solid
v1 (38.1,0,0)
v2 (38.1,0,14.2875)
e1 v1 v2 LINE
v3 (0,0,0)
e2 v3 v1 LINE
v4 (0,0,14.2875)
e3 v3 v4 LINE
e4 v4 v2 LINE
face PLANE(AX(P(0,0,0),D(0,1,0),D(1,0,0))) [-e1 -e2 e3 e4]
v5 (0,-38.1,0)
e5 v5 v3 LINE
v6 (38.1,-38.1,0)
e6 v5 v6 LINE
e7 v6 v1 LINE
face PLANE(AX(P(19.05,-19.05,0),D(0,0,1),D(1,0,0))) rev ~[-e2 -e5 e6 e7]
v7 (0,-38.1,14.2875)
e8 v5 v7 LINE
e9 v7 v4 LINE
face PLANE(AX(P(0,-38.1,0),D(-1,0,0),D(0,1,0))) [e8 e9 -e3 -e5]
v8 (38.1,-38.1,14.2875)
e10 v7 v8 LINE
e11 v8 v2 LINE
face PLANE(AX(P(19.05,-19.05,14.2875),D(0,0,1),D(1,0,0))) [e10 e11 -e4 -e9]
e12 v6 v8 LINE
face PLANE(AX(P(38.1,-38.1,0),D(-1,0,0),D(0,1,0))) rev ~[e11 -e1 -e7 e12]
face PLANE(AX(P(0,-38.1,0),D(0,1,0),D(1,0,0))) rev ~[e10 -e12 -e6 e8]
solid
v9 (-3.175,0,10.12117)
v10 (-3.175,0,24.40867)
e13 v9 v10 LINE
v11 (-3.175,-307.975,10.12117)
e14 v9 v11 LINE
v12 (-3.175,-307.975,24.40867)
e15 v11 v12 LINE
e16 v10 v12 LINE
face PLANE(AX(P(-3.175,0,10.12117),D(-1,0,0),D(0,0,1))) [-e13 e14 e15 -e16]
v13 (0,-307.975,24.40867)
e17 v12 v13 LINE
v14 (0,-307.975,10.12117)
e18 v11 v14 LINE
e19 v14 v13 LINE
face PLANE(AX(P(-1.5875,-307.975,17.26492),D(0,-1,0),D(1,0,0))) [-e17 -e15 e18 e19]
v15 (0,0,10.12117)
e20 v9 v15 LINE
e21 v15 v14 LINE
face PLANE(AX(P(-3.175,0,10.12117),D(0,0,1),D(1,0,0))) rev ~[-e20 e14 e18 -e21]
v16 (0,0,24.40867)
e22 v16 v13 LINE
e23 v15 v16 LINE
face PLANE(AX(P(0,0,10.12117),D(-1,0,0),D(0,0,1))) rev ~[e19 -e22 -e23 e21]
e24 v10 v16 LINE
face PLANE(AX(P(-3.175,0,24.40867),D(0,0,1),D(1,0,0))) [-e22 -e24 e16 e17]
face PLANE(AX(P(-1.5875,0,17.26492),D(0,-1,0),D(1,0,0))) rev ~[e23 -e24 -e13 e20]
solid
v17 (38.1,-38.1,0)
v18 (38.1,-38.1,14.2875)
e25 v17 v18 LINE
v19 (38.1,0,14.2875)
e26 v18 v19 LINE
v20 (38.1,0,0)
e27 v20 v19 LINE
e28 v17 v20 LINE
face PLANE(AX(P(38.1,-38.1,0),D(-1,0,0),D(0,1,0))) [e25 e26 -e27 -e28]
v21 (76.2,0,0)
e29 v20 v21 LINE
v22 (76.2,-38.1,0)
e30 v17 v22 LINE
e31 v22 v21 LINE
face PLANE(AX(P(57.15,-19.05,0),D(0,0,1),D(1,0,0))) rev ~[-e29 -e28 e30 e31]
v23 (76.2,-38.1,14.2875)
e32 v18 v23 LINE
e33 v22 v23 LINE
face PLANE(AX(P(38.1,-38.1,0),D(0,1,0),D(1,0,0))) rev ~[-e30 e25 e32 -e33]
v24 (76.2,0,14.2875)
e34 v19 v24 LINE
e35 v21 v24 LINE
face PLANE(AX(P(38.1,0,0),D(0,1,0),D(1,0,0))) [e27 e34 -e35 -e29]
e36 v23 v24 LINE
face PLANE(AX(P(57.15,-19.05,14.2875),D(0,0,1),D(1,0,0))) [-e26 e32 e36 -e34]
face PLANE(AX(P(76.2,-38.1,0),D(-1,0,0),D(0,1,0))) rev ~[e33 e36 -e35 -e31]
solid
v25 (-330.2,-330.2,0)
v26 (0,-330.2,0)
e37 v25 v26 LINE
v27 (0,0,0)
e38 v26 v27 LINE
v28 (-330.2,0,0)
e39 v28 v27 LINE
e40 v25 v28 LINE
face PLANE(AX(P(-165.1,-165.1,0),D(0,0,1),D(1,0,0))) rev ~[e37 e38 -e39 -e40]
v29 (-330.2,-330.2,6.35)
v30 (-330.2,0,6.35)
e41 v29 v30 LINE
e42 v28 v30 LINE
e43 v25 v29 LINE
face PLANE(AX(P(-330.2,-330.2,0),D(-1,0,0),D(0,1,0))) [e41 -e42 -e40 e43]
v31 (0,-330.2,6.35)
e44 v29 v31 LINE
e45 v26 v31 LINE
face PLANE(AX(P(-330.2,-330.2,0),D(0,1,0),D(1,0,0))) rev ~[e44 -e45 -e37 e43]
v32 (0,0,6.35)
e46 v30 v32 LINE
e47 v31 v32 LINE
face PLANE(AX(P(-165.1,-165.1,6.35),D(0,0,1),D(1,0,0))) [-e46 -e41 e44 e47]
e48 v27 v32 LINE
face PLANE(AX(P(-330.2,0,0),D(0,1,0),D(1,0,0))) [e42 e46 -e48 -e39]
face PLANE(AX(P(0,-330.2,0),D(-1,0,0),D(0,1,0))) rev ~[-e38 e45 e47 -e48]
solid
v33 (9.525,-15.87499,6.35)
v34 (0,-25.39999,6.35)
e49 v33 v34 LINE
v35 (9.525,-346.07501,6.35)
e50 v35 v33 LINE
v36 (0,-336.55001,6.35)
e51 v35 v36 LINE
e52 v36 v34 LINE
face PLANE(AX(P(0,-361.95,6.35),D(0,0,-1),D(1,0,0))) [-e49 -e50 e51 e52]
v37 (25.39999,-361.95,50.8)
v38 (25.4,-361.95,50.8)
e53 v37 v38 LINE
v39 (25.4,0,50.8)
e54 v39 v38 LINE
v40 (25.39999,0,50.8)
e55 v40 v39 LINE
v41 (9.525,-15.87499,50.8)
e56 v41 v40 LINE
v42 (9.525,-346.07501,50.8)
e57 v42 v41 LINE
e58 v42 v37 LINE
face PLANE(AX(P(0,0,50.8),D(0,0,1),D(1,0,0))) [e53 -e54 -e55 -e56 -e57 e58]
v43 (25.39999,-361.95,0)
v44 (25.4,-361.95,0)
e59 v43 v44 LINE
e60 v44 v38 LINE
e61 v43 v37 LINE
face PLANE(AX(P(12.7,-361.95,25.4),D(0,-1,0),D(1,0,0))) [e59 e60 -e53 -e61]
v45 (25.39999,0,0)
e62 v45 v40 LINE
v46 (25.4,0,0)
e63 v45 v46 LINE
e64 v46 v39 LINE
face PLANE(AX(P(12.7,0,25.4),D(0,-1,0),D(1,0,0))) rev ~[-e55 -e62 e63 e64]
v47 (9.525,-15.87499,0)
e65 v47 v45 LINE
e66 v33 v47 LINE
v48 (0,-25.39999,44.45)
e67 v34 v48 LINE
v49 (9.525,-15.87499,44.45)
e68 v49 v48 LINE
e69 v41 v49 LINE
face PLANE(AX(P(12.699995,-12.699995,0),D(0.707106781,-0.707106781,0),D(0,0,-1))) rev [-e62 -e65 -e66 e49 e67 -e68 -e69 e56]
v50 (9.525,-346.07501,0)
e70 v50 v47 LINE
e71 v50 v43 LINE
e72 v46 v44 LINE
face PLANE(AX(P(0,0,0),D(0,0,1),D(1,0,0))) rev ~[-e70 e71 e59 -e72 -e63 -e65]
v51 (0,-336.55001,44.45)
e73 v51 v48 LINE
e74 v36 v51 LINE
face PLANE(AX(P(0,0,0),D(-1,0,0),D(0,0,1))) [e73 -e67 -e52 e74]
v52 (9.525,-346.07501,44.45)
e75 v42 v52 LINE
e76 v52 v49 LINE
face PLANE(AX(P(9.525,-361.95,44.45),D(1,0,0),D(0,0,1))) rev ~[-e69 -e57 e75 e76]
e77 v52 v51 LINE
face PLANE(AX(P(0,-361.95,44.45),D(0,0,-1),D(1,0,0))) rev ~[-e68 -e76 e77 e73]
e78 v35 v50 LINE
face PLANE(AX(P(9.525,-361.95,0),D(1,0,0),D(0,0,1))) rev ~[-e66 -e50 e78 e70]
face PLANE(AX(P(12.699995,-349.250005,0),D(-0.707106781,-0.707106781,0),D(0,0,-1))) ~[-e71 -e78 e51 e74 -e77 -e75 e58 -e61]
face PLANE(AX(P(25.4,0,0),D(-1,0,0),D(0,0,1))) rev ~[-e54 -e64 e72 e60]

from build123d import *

# Parameters (mm, degrees)
F0_W      = 330.2
F0_H      = 330.2
F3_DEPTH  = 6.35
F2_W      = 38.1
F2_H      = 38.1
F4_DEPTH  = 14.2875
F1_W      = 25.4
F1_H      = 50.8
F5_DEPTH  = 361.95
F8_SIZE   = 25.39999
F6_W      = 9.525
F6_H      = 6.35
F9_DEPTH  = 361.951
F7_W      = 3.175
F7_H      = 14.2875
F10_DEPTH = 307.975
F11_W     = 38.1
F11_H     = 38.1
F12_DEPTH = 14.2875


# Not quite as in the source:
# - a fillet or chamfer is up to 0.001 mm smaller than in the source, because OpenCascade refuses the exact size


with BuildPart() as f3:
    # F0 (on Top) → F3 (new body)
    with BuildSketch(Plane.XY):
        with Locations((-165.1, -165.1)):
            Rectangle(F0_W, F0_H)
    extrude(amount=F3_DEPTH)


with BuildPart() as f4:
    # F2 (on Top) → F4 (new body)
    with BuildSketch(Plane.XY):
        with Locations((19.05, -19.05)):
            Rectangle(F2_W, F2_H)
    extrude(amount=F4_DEPTH)


with BuildPart() as f5:
    # F1 (on Front) → F5 (new body)
    with BuildSketch(Plane.XZ):
        with Locations((12.7, 25.4)):
            Rectangle(F1_W, F1_H)
    extrude(amount=F5_DEPTH)

    # F8 (size 25.4 in the source; OpenCascade refuses exactly that, so slightly less here)
    f8_edges = [f5.edges().sort_by_distance(p)[0] for p in [
        (0, -361.95, 25.4),
        (0, 0, 25.4),
    ]]
    chamfer(f8_edges, length=F8_SIZE)

    # F6 (on face) → F9 (cut, through all)
    with BuildSketch(Plane.XZ.offset(361.95)):
        with Locations((4.7625, 47.625)):
            Rectangle(F6_W, F6_H)
        with Locations((4.7625, 3.175)):
            Rectangle(F6_W, F6_H)
    extrude(amount=-F9_DEPTH, mode=Mode.SUBTRACT)


with BuildPart() as f10:
    # F7 (on Front) → F10 (new body)
    with BuildSketch(Plane.XZ):
        with Locations((-1.5875, 17.2649201432)):
            Rectangle(F7_W, F7_H)
    extrude(amount=F10_DEPTH)


with BuildPart() as f12:
    # F11 (on Top) → F12 (new body)
    with BuildSketch(Plane.XY):
        with Locations((57.15, -19.05)):
            Rectangle(F11_W, F11_H)
    extrude(amount=F12_DEPTH)


solid = Compound([f3.part, f4.part, f5.part, f10.part, f12.part])
